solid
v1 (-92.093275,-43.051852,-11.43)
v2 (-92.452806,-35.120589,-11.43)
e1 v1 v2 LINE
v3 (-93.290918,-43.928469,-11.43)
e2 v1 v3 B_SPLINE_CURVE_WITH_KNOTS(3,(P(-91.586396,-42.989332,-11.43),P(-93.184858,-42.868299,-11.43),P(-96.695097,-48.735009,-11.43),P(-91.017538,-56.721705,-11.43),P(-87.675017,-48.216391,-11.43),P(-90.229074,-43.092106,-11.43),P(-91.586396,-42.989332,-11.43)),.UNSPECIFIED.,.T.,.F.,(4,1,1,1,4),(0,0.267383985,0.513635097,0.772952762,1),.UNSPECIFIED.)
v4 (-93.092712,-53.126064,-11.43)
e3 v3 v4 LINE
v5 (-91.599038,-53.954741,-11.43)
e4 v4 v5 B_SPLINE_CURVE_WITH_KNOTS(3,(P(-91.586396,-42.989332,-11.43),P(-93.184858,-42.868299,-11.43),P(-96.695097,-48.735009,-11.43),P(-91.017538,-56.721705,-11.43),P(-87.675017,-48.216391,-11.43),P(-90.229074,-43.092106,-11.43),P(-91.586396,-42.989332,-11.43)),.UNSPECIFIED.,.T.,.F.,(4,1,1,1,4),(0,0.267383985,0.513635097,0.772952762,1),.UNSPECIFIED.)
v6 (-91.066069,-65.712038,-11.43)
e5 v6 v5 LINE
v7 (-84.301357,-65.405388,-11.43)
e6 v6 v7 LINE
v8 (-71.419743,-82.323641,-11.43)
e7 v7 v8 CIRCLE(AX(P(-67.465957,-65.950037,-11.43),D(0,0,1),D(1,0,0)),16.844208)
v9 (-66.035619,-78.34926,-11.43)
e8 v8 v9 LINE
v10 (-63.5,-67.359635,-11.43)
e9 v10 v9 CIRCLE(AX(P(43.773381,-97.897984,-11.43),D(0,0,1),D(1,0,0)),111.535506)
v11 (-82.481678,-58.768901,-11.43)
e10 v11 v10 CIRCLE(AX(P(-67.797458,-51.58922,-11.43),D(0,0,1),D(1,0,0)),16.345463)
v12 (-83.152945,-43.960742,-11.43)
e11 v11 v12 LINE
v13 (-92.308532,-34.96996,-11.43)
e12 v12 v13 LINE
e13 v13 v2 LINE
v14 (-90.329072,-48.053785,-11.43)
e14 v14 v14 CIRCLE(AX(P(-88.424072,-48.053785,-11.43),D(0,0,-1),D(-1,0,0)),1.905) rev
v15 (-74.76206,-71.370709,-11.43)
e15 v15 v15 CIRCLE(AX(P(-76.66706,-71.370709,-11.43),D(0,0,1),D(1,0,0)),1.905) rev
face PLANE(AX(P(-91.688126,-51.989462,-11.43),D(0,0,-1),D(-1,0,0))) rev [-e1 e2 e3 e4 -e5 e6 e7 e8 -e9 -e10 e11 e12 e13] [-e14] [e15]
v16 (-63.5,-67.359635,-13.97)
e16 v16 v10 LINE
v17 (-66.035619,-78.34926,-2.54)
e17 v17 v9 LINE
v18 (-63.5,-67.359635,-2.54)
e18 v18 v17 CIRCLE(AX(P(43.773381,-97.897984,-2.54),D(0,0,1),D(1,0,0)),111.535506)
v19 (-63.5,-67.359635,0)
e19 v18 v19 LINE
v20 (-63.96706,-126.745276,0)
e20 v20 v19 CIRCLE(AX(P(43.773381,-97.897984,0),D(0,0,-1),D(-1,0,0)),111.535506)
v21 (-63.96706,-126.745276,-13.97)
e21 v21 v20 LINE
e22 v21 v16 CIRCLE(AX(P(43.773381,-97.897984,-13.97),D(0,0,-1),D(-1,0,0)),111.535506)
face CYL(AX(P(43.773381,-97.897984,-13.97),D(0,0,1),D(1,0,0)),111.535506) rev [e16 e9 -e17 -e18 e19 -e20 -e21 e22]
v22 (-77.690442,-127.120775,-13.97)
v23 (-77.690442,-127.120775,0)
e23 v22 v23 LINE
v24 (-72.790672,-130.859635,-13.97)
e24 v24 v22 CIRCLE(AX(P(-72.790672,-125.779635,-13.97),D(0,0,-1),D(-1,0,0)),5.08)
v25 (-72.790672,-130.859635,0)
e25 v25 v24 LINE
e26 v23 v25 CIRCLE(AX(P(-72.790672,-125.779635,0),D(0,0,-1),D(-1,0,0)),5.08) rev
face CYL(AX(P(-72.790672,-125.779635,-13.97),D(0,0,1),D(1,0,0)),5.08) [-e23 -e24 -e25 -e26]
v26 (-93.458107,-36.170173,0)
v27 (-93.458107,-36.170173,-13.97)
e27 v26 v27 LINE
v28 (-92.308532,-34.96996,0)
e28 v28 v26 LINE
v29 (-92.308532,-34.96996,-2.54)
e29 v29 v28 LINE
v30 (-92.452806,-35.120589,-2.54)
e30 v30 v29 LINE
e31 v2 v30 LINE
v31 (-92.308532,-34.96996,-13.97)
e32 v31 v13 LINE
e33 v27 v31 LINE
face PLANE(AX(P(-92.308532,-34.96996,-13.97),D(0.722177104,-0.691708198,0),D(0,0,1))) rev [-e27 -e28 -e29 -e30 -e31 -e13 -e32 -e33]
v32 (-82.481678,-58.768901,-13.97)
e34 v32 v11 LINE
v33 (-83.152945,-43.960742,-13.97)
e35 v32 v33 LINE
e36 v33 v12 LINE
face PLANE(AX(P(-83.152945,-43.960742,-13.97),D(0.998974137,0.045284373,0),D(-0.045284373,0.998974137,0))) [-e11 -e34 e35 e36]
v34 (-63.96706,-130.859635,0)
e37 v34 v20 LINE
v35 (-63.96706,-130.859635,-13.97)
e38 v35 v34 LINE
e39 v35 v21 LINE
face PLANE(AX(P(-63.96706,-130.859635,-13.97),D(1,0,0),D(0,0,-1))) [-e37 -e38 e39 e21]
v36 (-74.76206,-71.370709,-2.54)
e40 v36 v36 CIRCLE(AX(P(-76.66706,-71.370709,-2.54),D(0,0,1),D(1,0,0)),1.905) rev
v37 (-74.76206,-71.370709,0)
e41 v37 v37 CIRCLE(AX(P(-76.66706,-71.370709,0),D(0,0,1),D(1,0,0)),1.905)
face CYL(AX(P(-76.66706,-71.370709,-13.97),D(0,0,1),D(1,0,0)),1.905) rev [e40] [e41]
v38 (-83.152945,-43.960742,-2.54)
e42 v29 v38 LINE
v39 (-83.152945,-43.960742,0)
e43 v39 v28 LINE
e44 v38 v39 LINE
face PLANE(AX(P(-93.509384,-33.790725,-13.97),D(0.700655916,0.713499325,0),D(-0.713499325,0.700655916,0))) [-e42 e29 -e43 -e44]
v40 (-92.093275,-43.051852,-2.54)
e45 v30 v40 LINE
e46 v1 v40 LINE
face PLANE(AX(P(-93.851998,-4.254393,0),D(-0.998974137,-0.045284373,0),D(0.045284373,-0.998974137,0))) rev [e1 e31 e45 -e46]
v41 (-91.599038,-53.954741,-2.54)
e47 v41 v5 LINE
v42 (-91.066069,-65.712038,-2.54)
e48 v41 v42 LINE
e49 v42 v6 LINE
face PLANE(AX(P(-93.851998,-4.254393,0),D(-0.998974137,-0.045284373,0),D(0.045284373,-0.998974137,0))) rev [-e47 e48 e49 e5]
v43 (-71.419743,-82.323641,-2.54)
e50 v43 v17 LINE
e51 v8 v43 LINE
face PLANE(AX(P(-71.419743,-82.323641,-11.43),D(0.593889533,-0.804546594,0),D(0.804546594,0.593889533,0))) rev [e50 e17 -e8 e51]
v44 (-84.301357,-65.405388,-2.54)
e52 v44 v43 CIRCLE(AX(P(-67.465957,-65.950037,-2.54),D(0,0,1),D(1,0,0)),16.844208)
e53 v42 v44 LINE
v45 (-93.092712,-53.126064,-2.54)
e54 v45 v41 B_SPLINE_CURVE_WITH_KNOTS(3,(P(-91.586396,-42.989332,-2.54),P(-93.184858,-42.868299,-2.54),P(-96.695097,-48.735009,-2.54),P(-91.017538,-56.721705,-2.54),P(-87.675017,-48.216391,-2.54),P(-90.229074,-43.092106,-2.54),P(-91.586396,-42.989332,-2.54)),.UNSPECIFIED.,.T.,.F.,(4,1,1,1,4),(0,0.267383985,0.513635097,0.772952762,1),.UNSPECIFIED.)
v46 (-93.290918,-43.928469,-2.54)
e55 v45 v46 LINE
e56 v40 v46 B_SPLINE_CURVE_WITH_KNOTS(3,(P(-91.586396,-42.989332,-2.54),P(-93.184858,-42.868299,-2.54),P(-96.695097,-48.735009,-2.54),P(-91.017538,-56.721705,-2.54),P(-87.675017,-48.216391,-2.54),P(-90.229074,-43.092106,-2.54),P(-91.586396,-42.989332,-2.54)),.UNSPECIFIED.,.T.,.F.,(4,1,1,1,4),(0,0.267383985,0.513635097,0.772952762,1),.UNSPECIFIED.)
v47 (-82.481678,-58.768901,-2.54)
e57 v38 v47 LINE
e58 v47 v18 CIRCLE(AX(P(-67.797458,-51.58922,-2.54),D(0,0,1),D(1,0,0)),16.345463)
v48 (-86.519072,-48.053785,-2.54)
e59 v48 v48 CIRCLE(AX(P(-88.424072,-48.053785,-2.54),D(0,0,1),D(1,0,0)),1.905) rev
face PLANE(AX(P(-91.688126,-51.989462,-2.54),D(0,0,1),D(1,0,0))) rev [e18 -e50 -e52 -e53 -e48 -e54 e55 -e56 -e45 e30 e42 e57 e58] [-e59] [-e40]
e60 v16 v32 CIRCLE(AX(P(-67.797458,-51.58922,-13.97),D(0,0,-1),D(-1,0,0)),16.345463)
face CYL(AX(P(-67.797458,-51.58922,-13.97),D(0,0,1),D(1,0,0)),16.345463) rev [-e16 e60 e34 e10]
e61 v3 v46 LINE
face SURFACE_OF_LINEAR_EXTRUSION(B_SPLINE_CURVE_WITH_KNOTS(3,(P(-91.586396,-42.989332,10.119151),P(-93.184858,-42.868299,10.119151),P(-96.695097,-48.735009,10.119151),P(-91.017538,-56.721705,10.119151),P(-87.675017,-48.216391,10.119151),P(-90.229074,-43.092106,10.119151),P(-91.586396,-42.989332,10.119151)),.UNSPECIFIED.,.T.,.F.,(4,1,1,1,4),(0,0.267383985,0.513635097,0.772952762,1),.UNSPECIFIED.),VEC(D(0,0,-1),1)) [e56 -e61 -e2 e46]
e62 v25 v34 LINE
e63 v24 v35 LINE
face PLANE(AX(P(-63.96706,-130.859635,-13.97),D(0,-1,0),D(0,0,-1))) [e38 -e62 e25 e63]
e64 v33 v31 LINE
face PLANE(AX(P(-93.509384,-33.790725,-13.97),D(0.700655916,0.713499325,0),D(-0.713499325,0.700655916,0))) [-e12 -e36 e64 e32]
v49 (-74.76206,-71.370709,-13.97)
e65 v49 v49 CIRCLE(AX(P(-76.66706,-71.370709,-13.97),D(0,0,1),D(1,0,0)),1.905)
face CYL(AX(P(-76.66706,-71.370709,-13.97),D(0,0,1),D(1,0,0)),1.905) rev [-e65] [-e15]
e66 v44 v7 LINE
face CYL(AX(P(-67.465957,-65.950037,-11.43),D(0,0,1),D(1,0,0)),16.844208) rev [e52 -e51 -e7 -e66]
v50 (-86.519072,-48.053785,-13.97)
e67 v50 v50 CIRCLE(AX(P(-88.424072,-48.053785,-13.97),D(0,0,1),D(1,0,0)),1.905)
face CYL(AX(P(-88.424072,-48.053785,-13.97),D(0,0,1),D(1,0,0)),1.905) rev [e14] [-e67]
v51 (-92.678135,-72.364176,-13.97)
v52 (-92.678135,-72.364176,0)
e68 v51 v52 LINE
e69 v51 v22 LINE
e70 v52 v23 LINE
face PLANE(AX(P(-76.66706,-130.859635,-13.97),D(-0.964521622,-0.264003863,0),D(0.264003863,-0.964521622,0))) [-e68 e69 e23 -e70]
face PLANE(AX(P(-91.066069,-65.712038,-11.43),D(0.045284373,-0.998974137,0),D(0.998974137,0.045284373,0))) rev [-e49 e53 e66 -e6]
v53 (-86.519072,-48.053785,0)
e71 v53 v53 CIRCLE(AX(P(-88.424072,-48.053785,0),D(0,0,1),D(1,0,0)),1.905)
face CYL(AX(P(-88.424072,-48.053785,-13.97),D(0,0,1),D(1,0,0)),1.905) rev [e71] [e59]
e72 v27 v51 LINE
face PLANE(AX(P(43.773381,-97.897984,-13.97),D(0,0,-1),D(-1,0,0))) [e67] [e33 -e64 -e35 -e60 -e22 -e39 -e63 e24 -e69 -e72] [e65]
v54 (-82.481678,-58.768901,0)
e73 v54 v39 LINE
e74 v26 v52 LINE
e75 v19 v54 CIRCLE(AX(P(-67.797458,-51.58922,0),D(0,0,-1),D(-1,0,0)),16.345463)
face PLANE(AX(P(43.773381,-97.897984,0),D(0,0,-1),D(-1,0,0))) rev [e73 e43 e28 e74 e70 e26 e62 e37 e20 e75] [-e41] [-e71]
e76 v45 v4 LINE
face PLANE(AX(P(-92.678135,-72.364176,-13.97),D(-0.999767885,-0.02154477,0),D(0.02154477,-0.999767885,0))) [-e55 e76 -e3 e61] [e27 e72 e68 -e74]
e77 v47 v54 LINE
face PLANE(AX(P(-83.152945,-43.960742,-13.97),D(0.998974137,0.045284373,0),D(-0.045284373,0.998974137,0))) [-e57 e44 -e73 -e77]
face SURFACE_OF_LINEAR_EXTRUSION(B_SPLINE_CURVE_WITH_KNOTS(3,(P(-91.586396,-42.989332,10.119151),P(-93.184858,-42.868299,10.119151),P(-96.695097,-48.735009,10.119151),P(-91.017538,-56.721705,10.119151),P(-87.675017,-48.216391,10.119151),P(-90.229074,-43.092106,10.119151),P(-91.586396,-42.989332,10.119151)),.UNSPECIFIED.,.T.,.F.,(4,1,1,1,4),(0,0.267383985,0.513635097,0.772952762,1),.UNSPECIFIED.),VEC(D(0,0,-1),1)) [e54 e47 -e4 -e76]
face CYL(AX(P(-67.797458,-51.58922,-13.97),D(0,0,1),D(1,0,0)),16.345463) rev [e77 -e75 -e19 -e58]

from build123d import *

# Parameters (mm, degrees)
SKETCH2_R           = 1.905
BOSS_EXTRUDE1_DEPTH = 13.97
SKETCH7_W           = 8.89
SKETCH7_H           = 13.736668288
CUT_EXTRUDE1_DEPTH  = 8.89
SKETCH8_W           = 15.99010018
SKETCH8_H           = 8.89
CUT_EXTRUDE2_DEPTH  = 38.354
CUT_EXTRUDE4_START  = -2.54
CUT_EXTRUDE4_DEPTH  = 8.89
FILLET1_R           = 5.08
CHAMFER1_SIZE       = 2.38
CHAMFER1_SIZE_2     = 1.683044883
CUT_EXTRUDE5_DEPTH  = 8.89


with BuildPart() as part:
    # Sketch2 → Boss-Extrude1 (new body)
    with BuildSketch(Plane.XY):
        with BuildLine():
            Line((-63.967060474, -130.859635454), (-76.667060474, -130.859635454))
            Line((-76.667060474, -130.859635454), (-92.67813479, -72.364175631))
            Line((-92.67813479, -72.364175631), (-93.509383851, -33.790725064))
            Line((-93.509383851, -33.790725064), (-83.152945307, -43.960741607))
            Line((-83.152945307, -43.960741607), (-82.481678491, -58.768900565))
            ThreePointArc((-82.481678491, -58.768900565), (-74.536997263, -66.480585097), (-63.5, -67.359635454))
            ThreePointArc((-63.5, -67.359635454), (-67.758675084, -97.020798424), (-63.967060474, -126.745275894))
            Line((-63.967060474, -126.745275894), (-63.967060474, -130.859635454))
        make_face()
        with Locations((-88.424072453, -48.053785371)):
            Circle(SKETCH2_R, mode=Mode.SUBTRACT)
        with Locations((-76.667060474, -71.37070905)):
            Circle(SKETCH2_R, mode=Mode.SUBTRACT)
    extrude(amount=-BOSS_EXTRUDE1_DEPTH)

    # Sketch7 → Cut-Extrude1 (cut)
    with BuildSketch(Plane(origin=(-84.97111807, -3.851815205, 0), x_dir=(0, 0, -1), z_dir=(0.9989741366022207, 0.04528437257871392, 0))):
        with Locations((6.985, -54.652422544)):
            Rectangle(SKETCH7_W, SKETCH7_H)
    extrude(amount=-CUT_EXTRUDE1_DEPTH, mode=Mode.SUBTRACT)

    # Sketch8 → Cut-Extrude2 (cut)
    with BuildSketch(Plane(origin=(2.163872462, -47.735068453, 0), x_dir=(0.9989741366022207, 0.04528437257871392, 0), z_dir=(0.04528437257871392, -0.9989741366022207, 0))):
        with Locations((-85.953326255, -6.985)):
            Rectangle(SKETCH8_W, SKETCH8_H)
    extrude(amount=-CUT_EXTRUDE2_DEPTH, mode=Mode.SUBTRACT)

    # Sketch9 → Cut-Extrude4 (cut)
    with BuildSketch(Plane.XY.offset(CUT_EXTRUDE4_START)):
        with BuildLine():
            Line((-82.481678491, -58.768900565), (-84.301115942, -65.397976437))
            ThreePointArc((-84.301115942, -65.397976437), (-80.869859076, -76.151152323), (-71.419742843, -82.323641162))
            Line((-71.419742843, -82.323641162), (-53.044010763, -68.759286996))
            Line((-53.044010763, -68.759286996), (-82.481678491, -58.768900565))
        make_face()
    extrude(amount=-CUT_EXTRUDE4_DEPTH, mode=Mode.SUBTRACT)

    # Fillet1
    fillet1_edges = [part.edges().sort_by_distance(p)[0] for p in [
        (-76.667060474, -130.859635454, -6.985),
    ]]
    fillet(fillet1_edges, radius=FILLET1_R)

    # Chamfer1
    # the kernel refuses this chamfer: 2.38, 1.683044883 mm, written as the material it takes off along each edge
    with BuildSketch(Plane(origin=(-93.509383851, -33.790725064, 6.120605511), x_dir=(-0.005952870242771505, -0.9999822815109639, 0), z_dir=(0, 0, -1))) as chamfer1_piece_1:
        Polygon((CHAMFER1_SIZE * 0.999621916911, -CHAMFER1_SIZE * 0.0274958766106), (CHAMFER1_SIZE_2 * 0.69639613284, -CHAMFER1_SIZE_2 * 0.717657596567), (0, 0), align=None)
    extrude(amount=26.211211023, mode=Mode.SUBTRACT)

    # Sketch10 → Cut-Extrude5 (cut)
    with BuildSketch(Plane.XY.offset(-11.43)):
        with BuildLine():
            add(Edge.make_bspline(
                [(-91.586396319, -42.98933193), (-93.184858066, -42.868299271), (-96.695097172, -48.735009259), (-91.017537843, -56.721704987), (-87.675016869, -48.216390701), (-90.229073725, -43.092105964), (-91.586396319, -42.98933193)],
                knots=[0, 0, 0, 0, 0.267383985, 0.513635097, 0.772952762, 1, 1, 1, 1], degree=3))
        make_face()
    extrude(amount=CUT_EXTRUDE5_DEPTH, mode=Mode.SUBTRACT)


solid = part.part
